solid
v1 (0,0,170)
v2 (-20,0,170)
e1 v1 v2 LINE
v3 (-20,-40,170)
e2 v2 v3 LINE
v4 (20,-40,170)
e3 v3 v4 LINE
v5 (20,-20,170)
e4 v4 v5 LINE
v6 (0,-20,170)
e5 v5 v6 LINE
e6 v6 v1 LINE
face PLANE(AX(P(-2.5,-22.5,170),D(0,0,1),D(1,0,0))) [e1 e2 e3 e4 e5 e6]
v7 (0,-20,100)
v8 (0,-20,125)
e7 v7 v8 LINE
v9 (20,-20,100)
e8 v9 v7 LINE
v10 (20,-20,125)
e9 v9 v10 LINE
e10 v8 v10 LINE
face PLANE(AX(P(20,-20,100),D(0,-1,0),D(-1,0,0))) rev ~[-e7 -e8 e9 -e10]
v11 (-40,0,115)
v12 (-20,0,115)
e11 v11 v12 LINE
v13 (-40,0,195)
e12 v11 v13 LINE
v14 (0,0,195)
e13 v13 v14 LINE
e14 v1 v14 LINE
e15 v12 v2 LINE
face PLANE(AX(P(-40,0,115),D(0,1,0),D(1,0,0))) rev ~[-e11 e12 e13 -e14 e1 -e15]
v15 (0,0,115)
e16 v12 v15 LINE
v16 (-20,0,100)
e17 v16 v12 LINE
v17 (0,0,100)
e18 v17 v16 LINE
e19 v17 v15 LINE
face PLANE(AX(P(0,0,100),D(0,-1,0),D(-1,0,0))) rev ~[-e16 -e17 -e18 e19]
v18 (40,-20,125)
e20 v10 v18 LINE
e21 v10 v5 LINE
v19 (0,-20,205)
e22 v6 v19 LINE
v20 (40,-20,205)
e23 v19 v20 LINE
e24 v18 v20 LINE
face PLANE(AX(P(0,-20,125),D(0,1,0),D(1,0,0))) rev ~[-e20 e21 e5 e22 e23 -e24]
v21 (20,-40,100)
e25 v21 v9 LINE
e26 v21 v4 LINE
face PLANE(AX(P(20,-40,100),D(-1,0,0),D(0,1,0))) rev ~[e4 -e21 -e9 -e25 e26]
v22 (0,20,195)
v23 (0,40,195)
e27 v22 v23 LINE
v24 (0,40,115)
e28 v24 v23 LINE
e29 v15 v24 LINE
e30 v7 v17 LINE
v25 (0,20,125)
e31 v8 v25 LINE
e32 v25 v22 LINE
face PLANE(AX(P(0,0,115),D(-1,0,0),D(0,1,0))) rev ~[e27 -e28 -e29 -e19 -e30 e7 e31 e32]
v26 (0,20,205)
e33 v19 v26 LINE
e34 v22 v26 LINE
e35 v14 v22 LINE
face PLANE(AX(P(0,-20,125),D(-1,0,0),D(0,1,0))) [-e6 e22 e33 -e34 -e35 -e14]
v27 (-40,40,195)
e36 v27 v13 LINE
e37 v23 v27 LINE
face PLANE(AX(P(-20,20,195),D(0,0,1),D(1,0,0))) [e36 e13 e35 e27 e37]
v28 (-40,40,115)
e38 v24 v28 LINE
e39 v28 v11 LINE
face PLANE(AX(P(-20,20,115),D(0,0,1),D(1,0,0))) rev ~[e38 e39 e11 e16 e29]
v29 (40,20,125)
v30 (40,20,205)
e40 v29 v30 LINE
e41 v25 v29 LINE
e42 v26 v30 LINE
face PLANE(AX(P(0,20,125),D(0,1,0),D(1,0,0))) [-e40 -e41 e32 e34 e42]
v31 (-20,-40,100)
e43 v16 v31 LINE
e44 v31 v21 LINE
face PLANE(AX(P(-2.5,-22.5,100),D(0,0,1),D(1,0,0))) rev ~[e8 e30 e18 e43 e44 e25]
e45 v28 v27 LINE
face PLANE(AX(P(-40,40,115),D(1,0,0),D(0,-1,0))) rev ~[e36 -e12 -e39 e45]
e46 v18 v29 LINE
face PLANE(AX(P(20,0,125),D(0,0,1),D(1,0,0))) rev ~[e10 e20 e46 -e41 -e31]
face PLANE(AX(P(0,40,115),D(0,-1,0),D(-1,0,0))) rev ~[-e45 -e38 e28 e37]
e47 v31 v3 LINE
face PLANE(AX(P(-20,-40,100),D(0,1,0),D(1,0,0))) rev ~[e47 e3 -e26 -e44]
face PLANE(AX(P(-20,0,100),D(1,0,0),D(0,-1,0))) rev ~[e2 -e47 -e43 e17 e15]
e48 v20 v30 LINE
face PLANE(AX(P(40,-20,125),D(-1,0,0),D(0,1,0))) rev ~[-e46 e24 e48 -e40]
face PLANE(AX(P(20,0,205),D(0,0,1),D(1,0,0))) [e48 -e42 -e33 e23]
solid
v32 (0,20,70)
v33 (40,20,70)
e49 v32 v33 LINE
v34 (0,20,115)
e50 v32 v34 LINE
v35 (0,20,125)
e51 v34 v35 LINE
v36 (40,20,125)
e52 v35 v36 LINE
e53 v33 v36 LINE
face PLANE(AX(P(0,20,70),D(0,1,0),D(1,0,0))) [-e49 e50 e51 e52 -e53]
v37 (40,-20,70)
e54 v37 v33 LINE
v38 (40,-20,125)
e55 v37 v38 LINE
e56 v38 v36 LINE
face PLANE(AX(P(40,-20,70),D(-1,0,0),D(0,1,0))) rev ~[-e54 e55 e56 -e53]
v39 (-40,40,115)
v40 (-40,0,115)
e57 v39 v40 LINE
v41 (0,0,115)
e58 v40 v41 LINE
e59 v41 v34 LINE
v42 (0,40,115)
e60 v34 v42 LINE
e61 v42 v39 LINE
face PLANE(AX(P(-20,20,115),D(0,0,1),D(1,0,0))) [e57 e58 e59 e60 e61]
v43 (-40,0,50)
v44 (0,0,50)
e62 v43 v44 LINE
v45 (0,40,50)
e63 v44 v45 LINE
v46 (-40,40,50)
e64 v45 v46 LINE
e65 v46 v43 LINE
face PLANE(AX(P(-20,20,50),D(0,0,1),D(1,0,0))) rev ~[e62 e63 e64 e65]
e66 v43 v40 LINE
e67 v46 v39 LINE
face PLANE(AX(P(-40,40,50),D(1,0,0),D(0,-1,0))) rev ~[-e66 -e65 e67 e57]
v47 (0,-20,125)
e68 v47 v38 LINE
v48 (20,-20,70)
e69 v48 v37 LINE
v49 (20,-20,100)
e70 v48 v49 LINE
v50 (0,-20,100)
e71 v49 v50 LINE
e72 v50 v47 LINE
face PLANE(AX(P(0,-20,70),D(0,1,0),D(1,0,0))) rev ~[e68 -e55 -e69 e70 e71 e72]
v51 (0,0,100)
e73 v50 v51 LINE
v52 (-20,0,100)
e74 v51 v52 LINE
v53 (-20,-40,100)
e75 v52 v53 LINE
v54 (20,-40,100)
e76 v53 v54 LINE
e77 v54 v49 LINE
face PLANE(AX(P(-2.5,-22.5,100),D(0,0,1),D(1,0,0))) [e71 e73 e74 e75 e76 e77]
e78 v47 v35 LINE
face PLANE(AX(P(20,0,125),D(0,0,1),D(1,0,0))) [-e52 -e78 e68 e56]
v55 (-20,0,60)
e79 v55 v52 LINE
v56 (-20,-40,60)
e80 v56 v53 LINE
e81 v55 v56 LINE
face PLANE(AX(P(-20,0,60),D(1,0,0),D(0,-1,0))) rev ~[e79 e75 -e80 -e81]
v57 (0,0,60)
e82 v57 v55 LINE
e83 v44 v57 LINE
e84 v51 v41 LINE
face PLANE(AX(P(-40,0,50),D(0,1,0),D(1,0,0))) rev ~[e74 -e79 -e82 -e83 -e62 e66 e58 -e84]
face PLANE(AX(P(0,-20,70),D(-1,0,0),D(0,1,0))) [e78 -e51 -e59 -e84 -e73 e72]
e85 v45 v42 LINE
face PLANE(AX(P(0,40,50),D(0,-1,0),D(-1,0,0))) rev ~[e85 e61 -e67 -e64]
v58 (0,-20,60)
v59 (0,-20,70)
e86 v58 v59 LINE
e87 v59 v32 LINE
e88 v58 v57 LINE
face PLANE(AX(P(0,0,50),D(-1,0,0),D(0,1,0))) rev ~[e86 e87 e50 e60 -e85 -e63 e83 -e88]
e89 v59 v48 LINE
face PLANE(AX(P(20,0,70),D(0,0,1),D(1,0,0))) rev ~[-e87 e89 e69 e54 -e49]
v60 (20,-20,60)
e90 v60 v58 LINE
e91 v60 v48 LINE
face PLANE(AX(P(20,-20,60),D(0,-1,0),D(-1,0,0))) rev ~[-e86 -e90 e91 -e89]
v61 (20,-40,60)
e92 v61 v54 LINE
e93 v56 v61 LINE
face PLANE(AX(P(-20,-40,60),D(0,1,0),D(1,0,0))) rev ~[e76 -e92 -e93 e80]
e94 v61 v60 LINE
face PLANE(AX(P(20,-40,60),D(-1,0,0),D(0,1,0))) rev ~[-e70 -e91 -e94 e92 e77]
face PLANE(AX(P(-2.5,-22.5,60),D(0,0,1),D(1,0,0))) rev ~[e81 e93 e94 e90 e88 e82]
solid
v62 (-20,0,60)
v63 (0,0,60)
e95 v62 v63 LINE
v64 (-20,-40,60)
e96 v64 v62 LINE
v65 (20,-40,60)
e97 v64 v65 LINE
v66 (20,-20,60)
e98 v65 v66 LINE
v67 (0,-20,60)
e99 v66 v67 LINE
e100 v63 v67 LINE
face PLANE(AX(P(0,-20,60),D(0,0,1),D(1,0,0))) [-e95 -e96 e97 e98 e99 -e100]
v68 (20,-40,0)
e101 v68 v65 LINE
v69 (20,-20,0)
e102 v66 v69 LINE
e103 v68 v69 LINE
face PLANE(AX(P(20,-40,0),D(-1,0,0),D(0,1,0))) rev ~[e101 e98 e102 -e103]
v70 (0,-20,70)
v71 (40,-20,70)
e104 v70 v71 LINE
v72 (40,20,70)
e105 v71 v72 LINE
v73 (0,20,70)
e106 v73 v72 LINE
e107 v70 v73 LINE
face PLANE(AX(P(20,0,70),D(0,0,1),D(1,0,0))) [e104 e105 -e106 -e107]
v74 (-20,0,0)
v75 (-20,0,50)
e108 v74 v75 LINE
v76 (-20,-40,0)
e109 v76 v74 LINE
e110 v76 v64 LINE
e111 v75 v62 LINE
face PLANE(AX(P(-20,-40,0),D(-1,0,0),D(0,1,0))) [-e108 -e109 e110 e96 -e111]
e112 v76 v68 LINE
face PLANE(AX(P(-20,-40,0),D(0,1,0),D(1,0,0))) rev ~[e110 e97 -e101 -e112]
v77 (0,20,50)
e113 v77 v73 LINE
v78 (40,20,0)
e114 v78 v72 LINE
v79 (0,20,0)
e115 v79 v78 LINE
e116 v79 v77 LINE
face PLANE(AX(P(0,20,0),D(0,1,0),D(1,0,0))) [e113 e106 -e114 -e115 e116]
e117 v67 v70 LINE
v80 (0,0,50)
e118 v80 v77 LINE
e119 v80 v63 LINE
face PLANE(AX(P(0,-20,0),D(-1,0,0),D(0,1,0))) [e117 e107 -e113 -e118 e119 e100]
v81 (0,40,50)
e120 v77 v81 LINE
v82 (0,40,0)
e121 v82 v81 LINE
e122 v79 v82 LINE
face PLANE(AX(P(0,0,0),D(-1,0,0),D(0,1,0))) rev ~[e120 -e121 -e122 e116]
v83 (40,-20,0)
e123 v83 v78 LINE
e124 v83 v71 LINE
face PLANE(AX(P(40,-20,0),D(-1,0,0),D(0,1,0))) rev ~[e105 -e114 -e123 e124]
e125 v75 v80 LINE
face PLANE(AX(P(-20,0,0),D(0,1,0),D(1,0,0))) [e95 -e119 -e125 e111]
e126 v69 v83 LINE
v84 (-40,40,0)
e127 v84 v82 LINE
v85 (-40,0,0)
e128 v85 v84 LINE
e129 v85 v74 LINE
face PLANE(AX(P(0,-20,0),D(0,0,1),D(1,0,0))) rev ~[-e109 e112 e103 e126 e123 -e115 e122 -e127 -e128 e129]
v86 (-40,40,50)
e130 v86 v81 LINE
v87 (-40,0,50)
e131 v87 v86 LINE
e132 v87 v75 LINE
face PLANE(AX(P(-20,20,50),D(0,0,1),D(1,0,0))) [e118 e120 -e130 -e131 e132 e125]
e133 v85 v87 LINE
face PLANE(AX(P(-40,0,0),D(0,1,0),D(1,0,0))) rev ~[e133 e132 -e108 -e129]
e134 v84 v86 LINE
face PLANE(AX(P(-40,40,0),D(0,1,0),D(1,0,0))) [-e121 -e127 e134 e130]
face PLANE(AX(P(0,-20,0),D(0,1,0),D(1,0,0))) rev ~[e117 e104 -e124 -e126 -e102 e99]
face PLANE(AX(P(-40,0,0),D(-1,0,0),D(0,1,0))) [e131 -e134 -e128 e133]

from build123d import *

# Parameters (mm, degrees)
F0_W      = 40
F0_H      = 40
F1_DEPTH  = 50
F2_W      = 40
F2_H      = 40
F3_DEPTH  = 60
F4_W      = 40
F4_H      = 40
F5_DEPTH  = 70
F7_DEPTH  = 65
F9_DEPTH  = 40
F10_W     = 40
F10_H     = 40
F11_DEPTH = 55
F14_DEPTH = 70
F16_DEPTH = 80
F17_W     = 40
F17_H     = 40
F18_DEPTH = 80


with BuildPart() as f1:
    # F0 (on Top) → F1 (new body)
    with BuildSketch(Plane.XY):
        with Locations((-20, 20)):
            Rectangle(F0_W, F0_H)
    extrude(amount=F1_DEPTH)

    # F2 (on Top) → F3 (join)
    with BuildSketch(Plane.XY):
        with Locations((0, -20)):
            Rectangle(F2_W, F2_H)
    extrude(amount=F3_DEPTH)

    # F4 (on Top) → F5 (join)
    with BuildSketch(Plane.XY):
        with Locations((20, 0)):
            Rectangle(F4_W, F4_H)
    extrude(amount=F5_DEPTH)


with BuildPart() as f7:
    # F6 (on face) → F7 (new body)
    with BuildSketch(Plane.XY.offset(50)):
        Polygon((-20, 0), (0, 0), (0, 20), (0, 40), (-40, 40), (-40, 0), align=None)
    extrude(amount=F7_DEPTH)

    # F8 (on face) → F9 (join)
    with BuildSketch(Plane.XY.offset(60)):
        Polygon((20, -40), (20, -20), (0, -20), (0, 0), (-20, 0), (-20, -40), align=None)
    extrude(amount=F9_DEPTH)

    # F10 (on face) → F11 (join)
    with BuildSketch(Plane.XY.offset(70)):
        with Locations((20, 0)):
            Rectangle(F10_W, F10_H)
    extrude(amount=F11_DEPTH)

    # F12: union 


with BuildPart() as f14:
    # F13 (on face) → F14 (new body)
    with BuildSketch(Plane.XY.offset(100)):
        Polygon((-20, -40), (20, -40), (20, -20), (0, -20), (0, 0), (-20, 0), align=None)
    extrude(amount=F14_DEPTH)

    # F15 (on face) → F16 (join)
    with BuildSketch(Plane.XY.offset(115)):
        Polygon((-40, 40), (-40, 0), (0, 0), (0, 20), (0, 40), align=None)
    extrude(amount=F16_DEPTH)

    # F17 (on face) → F18 (join)
    with BuildSketch(Plane.XY.offset(125)):
        with Locations((20, 0)):
            Rectangle(F17_W, F17_H)
    extrude(amount=F18_DEPTH)


solid = Compound([f1.part, f7.part, f14.part])
